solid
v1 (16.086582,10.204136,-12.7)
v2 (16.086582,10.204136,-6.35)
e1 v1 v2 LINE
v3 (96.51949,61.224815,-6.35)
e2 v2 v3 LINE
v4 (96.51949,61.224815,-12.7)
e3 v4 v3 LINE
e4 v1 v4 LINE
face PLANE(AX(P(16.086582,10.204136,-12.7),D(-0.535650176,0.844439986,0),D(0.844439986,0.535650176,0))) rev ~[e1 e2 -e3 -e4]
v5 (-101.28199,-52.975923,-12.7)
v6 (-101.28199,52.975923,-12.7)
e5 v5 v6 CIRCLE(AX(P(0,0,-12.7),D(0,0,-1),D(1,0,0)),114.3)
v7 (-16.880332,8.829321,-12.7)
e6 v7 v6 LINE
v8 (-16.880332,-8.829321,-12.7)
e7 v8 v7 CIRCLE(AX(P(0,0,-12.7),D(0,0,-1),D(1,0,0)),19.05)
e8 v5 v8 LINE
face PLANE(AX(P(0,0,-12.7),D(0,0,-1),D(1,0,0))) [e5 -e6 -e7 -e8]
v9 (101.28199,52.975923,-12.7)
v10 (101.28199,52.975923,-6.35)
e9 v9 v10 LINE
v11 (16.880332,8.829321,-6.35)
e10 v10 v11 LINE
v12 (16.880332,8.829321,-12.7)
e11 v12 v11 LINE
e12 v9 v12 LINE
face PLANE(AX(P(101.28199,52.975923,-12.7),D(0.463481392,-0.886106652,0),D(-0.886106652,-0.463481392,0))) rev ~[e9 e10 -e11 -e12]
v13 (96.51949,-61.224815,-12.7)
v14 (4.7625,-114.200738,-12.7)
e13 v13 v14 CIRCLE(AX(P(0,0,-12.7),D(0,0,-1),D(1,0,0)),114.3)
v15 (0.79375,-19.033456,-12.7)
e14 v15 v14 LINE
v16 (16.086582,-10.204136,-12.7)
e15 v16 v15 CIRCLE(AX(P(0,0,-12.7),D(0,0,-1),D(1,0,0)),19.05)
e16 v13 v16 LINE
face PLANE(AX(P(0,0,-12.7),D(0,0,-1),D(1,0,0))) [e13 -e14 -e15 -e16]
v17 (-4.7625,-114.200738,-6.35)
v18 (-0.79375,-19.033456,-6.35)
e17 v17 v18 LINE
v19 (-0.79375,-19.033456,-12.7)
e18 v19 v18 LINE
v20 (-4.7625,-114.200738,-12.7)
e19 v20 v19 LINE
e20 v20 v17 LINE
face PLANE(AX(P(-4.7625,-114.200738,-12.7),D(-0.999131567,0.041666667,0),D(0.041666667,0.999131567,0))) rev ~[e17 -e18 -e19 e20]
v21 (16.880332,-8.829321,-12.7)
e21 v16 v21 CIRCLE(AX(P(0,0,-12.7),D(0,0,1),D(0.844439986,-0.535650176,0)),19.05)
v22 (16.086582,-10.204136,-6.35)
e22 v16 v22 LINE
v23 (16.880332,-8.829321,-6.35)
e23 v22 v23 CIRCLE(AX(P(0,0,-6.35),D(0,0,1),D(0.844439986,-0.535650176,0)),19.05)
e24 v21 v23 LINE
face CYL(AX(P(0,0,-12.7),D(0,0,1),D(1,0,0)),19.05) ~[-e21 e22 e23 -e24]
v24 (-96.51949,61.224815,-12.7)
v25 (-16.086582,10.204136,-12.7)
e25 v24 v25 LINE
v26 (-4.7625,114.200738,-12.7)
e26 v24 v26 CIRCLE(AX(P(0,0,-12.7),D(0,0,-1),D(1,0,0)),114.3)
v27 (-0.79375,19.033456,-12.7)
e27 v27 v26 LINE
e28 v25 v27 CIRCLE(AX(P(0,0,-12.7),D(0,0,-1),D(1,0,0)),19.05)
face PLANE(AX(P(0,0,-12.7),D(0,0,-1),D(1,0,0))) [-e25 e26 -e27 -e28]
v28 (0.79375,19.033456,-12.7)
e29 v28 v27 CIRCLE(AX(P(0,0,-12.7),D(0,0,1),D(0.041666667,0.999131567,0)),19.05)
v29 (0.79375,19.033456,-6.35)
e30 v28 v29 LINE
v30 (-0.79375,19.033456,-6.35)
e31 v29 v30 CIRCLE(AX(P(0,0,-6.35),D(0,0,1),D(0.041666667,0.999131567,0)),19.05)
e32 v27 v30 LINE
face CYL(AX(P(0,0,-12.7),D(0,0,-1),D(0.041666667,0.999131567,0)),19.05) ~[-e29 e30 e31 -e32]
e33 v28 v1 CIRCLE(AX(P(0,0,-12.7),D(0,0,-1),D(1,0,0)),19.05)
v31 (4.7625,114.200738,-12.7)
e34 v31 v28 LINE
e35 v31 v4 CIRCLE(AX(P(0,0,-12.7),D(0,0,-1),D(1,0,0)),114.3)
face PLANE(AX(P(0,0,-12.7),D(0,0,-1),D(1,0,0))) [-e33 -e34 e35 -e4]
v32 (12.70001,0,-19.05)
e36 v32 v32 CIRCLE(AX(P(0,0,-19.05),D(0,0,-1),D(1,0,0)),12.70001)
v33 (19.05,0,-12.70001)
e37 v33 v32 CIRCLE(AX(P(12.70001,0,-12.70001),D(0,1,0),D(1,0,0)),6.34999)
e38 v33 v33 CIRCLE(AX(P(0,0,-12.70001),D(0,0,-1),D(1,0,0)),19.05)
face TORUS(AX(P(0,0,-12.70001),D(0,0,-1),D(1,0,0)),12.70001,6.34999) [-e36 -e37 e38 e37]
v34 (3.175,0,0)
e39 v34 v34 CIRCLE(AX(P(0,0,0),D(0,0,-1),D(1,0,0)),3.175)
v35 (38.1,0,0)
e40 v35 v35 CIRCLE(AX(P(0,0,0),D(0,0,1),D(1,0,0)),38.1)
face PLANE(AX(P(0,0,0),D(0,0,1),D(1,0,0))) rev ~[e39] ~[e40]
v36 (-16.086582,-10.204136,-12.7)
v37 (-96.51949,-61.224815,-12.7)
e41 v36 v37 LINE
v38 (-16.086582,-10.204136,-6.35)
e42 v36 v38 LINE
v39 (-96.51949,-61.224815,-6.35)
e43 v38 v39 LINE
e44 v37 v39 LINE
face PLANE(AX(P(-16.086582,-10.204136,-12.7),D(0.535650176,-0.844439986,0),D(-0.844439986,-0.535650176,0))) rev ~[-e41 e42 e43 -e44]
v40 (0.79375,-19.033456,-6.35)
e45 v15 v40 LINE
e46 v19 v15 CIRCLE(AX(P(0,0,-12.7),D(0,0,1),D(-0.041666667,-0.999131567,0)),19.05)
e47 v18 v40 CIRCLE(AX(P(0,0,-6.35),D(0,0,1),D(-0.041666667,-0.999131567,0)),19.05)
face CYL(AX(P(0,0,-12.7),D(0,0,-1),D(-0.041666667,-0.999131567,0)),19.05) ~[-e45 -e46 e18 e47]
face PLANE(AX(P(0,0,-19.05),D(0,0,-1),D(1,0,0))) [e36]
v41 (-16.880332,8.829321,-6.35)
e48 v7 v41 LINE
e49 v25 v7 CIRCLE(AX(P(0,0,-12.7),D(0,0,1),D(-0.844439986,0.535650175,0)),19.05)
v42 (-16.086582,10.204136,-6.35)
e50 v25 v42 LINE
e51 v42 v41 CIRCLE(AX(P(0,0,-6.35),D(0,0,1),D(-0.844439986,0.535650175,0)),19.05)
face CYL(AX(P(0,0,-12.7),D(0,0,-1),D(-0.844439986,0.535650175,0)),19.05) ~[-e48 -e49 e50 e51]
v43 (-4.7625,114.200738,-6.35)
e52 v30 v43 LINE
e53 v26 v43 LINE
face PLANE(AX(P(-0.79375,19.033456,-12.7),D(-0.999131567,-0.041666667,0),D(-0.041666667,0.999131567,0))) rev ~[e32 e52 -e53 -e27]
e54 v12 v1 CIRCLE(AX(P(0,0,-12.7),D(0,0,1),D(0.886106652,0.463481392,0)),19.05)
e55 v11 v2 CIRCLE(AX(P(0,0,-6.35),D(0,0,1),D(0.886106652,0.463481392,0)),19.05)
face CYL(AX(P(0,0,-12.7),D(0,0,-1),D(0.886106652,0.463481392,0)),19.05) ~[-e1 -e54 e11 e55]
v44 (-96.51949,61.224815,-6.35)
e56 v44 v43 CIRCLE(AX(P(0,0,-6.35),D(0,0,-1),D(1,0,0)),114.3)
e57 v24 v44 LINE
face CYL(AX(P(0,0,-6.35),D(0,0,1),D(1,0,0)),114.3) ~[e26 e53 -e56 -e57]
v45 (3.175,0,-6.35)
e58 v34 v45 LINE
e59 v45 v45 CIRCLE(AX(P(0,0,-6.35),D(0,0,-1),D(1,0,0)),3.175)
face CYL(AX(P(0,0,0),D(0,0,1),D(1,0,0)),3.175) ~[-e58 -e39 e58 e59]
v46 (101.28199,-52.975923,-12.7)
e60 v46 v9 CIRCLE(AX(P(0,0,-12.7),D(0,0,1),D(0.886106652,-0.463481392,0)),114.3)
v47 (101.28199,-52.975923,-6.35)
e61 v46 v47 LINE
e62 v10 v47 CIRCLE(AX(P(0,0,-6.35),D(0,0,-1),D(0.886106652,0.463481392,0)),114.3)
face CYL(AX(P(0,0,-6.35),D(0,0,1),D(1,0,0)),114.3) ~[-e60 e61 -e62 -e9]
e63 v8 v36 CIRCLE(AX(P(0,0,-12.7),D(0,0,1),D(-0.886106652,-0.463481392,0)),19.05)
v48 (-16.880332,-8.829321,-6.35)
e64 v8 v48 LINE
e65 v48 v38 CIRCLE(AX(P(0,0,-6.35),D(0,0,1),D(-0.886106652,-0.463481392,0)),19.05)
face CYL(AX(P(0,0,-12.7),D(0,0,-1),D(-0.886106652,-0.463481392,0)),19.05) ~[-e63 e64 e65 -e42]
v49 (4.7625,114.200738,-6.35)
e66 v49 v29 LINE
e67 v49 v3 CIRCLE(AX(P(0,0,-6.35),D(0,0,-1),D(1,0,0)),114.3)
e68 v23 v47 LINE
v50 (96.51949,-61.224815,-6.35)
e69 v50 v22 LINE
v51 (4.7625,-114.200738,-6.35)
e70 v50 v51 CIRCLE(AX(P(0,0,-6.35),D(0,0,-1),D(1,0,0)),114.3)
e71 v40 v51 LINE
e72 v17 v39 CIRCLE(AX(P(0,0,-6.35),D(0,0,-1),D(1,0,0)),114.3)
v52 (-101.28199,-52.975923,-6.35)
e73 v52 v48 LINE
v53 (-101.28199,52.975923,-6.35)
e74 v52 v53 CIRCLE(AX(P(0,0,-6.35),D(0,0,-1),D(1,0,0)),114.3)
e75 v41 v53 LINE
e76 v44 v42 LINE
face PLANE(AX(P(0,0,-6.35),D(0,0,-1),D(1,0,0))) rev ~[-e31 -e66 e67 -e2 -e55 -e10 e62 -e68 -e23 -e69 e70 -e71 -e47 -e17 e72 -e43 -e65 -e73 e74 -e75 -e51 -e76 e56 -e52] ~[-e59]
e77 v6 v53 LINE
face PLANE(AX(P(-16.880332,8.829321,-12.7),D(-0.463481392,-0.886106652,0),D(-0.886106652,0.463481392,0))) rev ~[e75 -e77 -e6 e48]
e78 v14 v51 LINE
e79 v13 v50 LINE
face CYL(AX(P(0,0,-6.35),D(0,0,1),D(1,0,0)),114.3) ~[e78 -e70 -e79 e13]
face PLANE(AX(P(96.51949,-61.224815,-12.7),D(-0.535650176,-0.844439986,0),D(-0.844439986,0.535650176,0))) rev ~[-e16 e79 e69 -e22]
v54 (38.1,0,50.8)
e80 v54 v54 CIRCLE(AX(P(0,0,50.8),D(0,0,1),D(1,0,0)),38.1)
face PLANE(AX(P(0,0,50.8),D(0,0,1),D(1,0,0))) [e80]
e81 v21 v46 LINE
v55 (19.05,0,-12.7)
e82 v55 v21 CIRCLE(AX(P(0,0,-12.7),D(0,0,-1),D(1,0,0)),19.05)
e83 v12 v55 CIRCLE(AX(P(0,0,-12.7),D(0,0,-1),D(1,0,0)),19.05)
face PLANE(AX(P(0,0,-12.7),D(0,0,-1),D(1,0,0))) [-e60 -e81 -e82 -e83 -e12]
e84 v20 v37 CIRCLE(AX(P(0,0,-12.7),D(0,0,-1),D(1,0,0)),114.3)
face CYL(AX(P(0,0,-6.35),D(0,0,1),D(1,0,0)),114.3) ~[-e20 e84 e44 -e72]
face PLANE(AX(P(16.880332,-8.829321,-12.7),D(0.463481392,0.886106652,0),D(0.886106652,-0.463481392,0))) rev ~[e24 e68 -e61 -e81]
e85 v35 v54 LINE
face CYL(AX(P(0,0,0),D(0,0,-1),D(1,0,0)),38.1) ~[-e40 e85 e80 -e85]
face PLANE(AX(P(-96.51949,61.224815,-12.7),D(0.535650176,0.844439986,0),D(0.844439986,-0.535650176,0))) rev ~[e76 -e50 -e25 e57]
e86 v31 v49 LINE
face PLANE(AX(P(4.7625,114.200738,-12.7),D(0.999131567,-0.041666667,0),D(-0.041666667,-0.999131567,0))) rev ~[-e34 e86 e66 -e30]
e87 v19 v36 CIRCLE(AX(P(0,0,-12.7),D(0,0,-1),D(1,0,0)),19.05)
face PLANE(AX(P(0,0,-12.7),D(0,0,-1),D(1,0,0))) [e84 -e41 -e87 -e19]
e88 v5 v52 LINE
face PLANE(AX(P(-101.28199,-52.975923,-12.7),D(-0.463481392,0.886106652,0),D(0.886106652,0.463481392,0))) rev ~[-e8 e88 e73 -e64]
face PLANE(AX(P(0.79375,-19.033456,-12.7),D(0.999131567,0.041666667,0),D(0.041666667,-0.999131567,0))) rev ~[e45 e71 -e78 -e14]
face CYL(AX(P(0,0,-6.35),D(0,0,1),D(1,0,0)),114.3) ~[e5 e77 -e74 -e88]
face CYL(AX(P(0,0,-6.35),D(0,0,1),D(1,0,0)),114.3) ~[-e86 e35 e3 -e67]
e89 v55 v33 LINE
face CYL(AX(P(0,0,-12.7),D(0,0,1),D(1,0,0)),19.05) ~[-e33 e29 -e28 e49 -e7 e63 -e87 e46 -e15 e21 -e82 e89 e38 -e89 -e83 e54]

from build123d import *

# Parameters (mm, degrees)
F0_R            = 38.1
F1_DEPTH        = 50.8
F2_R            = 3.175
F3_DEPTH        = 6.35
F4_R            = 114.3
F5_DEPTH        = 6.35
F7_DEPTH        = 6.35
F7_COPIES_COUNT = 5
F7_COPIES_ANGLE = 240
F8_R            = 19.05
F9_DEPTH        = 6.35
F10_R           = 6.34999


# Not quite as in the source:
# - a fillet or chamfer is up to 0.001 mm smaller than in the source, because OpenCascade refuses the exact size
# - a pattern or mirror of a feature is missing from the dataset's text; its kind, count and spacing are read off the source's solid


with BuildPart() as f1:
    # F0 (on Top) → F1 (new body)
    with BuildSketch(Plane.XY):
        Circle(F0_R)
    extrude(amount=F1_DEPTH)

    # F2 (on face) → F3 (join)
    with BuildSketch(Plane(origin=(0, 0, 0), x_dir=(1, 0, 0), z_dir=(0, 0, -1))):
        Circle(F2_R)
    extrude(amount=F3_DEPTH)

    # F4 (on face) → F5 (join)
    with BuildSketch(Plane(origin=(0, 0, -6.35), x_dir=(1, 0, 0), z_dir=(0, 0, -1))):
        Circle(F4_R)
    extrude(amount=F5_DEPTH)

    # F6 (on face) → F7 (cut, through all)
    with BuildSketch(Plane(origin=(0, 0, -12.7), x_dir=(1, 0, 0), z_dir=(0, 0, -1))):
        with BuildLine():
            Line((16.880331728, 8.8293205148), (101.2819903679, 52.9759230889))
            ThreePointArc((101.2819903679, 52.9759230889), (98.9867036526, 57.15), (96.5194903679, 61.22481506))
            Line((96.5194903679, 61.22481506), (16.086581728, 10.2041358433))
            ThreePointArc((16.086581728, 10.2041358433), (16.4977839421, 9.525), (16.880331728, 8.8293205148))
        make_face()
        with BuildLine():
            ThreePointArc((96.5194903679, -61.22481506), (98.9867036526, -57.15), (101.2819903679, -52.9759230889))
            Line((101.2819903679, -52.9759230889), (16.880331728, -8.8293205148))
            ThreePointArc((16.880331728, -8.8293205148), (16.4977839421, -9.525), (16.086581728, -10.2041358433))
            Line((16.086581728, -10.2041358433), (96.5194903679, -61.22481506))
        make_face()
    f7 = extrude(amount=-F7_DEPTH, mode=Mode.SUBTRACT)

    # F7_copies: F7 ×5 about axis
    f7_copies_axis = Axis((0, 0, 0), (0, 0, 1))
    for i in range(1, F7_COPIES_COUNT):
        add(f7.rotate(f7_copies_axis, i * F7_COPIES_ANGLE / (F7_COPIES_COUNT - 1)), mode=Mode.SUBTRACT)

    # F8 (on face) → F9 (join)
    with BuildSketch(Plane(origin=(0, 0, -12.7), x_dir=(1, 0, 0), z_dir=(0, 0, -1))):
        Circle(F8_R)
    extrude(amount=F9_DEPTH)

    # F10 (radius 6.35 in the source; OpenCascade refuses exactly that, so slightly less here)
    f10_edges = [f1.edges().sort_by_distance(p)[0] for p in [
        (-19.05, 0, -19.05),
    ]]
    fillet(f10_edges, radius=F10_R)


solid = f1.part
